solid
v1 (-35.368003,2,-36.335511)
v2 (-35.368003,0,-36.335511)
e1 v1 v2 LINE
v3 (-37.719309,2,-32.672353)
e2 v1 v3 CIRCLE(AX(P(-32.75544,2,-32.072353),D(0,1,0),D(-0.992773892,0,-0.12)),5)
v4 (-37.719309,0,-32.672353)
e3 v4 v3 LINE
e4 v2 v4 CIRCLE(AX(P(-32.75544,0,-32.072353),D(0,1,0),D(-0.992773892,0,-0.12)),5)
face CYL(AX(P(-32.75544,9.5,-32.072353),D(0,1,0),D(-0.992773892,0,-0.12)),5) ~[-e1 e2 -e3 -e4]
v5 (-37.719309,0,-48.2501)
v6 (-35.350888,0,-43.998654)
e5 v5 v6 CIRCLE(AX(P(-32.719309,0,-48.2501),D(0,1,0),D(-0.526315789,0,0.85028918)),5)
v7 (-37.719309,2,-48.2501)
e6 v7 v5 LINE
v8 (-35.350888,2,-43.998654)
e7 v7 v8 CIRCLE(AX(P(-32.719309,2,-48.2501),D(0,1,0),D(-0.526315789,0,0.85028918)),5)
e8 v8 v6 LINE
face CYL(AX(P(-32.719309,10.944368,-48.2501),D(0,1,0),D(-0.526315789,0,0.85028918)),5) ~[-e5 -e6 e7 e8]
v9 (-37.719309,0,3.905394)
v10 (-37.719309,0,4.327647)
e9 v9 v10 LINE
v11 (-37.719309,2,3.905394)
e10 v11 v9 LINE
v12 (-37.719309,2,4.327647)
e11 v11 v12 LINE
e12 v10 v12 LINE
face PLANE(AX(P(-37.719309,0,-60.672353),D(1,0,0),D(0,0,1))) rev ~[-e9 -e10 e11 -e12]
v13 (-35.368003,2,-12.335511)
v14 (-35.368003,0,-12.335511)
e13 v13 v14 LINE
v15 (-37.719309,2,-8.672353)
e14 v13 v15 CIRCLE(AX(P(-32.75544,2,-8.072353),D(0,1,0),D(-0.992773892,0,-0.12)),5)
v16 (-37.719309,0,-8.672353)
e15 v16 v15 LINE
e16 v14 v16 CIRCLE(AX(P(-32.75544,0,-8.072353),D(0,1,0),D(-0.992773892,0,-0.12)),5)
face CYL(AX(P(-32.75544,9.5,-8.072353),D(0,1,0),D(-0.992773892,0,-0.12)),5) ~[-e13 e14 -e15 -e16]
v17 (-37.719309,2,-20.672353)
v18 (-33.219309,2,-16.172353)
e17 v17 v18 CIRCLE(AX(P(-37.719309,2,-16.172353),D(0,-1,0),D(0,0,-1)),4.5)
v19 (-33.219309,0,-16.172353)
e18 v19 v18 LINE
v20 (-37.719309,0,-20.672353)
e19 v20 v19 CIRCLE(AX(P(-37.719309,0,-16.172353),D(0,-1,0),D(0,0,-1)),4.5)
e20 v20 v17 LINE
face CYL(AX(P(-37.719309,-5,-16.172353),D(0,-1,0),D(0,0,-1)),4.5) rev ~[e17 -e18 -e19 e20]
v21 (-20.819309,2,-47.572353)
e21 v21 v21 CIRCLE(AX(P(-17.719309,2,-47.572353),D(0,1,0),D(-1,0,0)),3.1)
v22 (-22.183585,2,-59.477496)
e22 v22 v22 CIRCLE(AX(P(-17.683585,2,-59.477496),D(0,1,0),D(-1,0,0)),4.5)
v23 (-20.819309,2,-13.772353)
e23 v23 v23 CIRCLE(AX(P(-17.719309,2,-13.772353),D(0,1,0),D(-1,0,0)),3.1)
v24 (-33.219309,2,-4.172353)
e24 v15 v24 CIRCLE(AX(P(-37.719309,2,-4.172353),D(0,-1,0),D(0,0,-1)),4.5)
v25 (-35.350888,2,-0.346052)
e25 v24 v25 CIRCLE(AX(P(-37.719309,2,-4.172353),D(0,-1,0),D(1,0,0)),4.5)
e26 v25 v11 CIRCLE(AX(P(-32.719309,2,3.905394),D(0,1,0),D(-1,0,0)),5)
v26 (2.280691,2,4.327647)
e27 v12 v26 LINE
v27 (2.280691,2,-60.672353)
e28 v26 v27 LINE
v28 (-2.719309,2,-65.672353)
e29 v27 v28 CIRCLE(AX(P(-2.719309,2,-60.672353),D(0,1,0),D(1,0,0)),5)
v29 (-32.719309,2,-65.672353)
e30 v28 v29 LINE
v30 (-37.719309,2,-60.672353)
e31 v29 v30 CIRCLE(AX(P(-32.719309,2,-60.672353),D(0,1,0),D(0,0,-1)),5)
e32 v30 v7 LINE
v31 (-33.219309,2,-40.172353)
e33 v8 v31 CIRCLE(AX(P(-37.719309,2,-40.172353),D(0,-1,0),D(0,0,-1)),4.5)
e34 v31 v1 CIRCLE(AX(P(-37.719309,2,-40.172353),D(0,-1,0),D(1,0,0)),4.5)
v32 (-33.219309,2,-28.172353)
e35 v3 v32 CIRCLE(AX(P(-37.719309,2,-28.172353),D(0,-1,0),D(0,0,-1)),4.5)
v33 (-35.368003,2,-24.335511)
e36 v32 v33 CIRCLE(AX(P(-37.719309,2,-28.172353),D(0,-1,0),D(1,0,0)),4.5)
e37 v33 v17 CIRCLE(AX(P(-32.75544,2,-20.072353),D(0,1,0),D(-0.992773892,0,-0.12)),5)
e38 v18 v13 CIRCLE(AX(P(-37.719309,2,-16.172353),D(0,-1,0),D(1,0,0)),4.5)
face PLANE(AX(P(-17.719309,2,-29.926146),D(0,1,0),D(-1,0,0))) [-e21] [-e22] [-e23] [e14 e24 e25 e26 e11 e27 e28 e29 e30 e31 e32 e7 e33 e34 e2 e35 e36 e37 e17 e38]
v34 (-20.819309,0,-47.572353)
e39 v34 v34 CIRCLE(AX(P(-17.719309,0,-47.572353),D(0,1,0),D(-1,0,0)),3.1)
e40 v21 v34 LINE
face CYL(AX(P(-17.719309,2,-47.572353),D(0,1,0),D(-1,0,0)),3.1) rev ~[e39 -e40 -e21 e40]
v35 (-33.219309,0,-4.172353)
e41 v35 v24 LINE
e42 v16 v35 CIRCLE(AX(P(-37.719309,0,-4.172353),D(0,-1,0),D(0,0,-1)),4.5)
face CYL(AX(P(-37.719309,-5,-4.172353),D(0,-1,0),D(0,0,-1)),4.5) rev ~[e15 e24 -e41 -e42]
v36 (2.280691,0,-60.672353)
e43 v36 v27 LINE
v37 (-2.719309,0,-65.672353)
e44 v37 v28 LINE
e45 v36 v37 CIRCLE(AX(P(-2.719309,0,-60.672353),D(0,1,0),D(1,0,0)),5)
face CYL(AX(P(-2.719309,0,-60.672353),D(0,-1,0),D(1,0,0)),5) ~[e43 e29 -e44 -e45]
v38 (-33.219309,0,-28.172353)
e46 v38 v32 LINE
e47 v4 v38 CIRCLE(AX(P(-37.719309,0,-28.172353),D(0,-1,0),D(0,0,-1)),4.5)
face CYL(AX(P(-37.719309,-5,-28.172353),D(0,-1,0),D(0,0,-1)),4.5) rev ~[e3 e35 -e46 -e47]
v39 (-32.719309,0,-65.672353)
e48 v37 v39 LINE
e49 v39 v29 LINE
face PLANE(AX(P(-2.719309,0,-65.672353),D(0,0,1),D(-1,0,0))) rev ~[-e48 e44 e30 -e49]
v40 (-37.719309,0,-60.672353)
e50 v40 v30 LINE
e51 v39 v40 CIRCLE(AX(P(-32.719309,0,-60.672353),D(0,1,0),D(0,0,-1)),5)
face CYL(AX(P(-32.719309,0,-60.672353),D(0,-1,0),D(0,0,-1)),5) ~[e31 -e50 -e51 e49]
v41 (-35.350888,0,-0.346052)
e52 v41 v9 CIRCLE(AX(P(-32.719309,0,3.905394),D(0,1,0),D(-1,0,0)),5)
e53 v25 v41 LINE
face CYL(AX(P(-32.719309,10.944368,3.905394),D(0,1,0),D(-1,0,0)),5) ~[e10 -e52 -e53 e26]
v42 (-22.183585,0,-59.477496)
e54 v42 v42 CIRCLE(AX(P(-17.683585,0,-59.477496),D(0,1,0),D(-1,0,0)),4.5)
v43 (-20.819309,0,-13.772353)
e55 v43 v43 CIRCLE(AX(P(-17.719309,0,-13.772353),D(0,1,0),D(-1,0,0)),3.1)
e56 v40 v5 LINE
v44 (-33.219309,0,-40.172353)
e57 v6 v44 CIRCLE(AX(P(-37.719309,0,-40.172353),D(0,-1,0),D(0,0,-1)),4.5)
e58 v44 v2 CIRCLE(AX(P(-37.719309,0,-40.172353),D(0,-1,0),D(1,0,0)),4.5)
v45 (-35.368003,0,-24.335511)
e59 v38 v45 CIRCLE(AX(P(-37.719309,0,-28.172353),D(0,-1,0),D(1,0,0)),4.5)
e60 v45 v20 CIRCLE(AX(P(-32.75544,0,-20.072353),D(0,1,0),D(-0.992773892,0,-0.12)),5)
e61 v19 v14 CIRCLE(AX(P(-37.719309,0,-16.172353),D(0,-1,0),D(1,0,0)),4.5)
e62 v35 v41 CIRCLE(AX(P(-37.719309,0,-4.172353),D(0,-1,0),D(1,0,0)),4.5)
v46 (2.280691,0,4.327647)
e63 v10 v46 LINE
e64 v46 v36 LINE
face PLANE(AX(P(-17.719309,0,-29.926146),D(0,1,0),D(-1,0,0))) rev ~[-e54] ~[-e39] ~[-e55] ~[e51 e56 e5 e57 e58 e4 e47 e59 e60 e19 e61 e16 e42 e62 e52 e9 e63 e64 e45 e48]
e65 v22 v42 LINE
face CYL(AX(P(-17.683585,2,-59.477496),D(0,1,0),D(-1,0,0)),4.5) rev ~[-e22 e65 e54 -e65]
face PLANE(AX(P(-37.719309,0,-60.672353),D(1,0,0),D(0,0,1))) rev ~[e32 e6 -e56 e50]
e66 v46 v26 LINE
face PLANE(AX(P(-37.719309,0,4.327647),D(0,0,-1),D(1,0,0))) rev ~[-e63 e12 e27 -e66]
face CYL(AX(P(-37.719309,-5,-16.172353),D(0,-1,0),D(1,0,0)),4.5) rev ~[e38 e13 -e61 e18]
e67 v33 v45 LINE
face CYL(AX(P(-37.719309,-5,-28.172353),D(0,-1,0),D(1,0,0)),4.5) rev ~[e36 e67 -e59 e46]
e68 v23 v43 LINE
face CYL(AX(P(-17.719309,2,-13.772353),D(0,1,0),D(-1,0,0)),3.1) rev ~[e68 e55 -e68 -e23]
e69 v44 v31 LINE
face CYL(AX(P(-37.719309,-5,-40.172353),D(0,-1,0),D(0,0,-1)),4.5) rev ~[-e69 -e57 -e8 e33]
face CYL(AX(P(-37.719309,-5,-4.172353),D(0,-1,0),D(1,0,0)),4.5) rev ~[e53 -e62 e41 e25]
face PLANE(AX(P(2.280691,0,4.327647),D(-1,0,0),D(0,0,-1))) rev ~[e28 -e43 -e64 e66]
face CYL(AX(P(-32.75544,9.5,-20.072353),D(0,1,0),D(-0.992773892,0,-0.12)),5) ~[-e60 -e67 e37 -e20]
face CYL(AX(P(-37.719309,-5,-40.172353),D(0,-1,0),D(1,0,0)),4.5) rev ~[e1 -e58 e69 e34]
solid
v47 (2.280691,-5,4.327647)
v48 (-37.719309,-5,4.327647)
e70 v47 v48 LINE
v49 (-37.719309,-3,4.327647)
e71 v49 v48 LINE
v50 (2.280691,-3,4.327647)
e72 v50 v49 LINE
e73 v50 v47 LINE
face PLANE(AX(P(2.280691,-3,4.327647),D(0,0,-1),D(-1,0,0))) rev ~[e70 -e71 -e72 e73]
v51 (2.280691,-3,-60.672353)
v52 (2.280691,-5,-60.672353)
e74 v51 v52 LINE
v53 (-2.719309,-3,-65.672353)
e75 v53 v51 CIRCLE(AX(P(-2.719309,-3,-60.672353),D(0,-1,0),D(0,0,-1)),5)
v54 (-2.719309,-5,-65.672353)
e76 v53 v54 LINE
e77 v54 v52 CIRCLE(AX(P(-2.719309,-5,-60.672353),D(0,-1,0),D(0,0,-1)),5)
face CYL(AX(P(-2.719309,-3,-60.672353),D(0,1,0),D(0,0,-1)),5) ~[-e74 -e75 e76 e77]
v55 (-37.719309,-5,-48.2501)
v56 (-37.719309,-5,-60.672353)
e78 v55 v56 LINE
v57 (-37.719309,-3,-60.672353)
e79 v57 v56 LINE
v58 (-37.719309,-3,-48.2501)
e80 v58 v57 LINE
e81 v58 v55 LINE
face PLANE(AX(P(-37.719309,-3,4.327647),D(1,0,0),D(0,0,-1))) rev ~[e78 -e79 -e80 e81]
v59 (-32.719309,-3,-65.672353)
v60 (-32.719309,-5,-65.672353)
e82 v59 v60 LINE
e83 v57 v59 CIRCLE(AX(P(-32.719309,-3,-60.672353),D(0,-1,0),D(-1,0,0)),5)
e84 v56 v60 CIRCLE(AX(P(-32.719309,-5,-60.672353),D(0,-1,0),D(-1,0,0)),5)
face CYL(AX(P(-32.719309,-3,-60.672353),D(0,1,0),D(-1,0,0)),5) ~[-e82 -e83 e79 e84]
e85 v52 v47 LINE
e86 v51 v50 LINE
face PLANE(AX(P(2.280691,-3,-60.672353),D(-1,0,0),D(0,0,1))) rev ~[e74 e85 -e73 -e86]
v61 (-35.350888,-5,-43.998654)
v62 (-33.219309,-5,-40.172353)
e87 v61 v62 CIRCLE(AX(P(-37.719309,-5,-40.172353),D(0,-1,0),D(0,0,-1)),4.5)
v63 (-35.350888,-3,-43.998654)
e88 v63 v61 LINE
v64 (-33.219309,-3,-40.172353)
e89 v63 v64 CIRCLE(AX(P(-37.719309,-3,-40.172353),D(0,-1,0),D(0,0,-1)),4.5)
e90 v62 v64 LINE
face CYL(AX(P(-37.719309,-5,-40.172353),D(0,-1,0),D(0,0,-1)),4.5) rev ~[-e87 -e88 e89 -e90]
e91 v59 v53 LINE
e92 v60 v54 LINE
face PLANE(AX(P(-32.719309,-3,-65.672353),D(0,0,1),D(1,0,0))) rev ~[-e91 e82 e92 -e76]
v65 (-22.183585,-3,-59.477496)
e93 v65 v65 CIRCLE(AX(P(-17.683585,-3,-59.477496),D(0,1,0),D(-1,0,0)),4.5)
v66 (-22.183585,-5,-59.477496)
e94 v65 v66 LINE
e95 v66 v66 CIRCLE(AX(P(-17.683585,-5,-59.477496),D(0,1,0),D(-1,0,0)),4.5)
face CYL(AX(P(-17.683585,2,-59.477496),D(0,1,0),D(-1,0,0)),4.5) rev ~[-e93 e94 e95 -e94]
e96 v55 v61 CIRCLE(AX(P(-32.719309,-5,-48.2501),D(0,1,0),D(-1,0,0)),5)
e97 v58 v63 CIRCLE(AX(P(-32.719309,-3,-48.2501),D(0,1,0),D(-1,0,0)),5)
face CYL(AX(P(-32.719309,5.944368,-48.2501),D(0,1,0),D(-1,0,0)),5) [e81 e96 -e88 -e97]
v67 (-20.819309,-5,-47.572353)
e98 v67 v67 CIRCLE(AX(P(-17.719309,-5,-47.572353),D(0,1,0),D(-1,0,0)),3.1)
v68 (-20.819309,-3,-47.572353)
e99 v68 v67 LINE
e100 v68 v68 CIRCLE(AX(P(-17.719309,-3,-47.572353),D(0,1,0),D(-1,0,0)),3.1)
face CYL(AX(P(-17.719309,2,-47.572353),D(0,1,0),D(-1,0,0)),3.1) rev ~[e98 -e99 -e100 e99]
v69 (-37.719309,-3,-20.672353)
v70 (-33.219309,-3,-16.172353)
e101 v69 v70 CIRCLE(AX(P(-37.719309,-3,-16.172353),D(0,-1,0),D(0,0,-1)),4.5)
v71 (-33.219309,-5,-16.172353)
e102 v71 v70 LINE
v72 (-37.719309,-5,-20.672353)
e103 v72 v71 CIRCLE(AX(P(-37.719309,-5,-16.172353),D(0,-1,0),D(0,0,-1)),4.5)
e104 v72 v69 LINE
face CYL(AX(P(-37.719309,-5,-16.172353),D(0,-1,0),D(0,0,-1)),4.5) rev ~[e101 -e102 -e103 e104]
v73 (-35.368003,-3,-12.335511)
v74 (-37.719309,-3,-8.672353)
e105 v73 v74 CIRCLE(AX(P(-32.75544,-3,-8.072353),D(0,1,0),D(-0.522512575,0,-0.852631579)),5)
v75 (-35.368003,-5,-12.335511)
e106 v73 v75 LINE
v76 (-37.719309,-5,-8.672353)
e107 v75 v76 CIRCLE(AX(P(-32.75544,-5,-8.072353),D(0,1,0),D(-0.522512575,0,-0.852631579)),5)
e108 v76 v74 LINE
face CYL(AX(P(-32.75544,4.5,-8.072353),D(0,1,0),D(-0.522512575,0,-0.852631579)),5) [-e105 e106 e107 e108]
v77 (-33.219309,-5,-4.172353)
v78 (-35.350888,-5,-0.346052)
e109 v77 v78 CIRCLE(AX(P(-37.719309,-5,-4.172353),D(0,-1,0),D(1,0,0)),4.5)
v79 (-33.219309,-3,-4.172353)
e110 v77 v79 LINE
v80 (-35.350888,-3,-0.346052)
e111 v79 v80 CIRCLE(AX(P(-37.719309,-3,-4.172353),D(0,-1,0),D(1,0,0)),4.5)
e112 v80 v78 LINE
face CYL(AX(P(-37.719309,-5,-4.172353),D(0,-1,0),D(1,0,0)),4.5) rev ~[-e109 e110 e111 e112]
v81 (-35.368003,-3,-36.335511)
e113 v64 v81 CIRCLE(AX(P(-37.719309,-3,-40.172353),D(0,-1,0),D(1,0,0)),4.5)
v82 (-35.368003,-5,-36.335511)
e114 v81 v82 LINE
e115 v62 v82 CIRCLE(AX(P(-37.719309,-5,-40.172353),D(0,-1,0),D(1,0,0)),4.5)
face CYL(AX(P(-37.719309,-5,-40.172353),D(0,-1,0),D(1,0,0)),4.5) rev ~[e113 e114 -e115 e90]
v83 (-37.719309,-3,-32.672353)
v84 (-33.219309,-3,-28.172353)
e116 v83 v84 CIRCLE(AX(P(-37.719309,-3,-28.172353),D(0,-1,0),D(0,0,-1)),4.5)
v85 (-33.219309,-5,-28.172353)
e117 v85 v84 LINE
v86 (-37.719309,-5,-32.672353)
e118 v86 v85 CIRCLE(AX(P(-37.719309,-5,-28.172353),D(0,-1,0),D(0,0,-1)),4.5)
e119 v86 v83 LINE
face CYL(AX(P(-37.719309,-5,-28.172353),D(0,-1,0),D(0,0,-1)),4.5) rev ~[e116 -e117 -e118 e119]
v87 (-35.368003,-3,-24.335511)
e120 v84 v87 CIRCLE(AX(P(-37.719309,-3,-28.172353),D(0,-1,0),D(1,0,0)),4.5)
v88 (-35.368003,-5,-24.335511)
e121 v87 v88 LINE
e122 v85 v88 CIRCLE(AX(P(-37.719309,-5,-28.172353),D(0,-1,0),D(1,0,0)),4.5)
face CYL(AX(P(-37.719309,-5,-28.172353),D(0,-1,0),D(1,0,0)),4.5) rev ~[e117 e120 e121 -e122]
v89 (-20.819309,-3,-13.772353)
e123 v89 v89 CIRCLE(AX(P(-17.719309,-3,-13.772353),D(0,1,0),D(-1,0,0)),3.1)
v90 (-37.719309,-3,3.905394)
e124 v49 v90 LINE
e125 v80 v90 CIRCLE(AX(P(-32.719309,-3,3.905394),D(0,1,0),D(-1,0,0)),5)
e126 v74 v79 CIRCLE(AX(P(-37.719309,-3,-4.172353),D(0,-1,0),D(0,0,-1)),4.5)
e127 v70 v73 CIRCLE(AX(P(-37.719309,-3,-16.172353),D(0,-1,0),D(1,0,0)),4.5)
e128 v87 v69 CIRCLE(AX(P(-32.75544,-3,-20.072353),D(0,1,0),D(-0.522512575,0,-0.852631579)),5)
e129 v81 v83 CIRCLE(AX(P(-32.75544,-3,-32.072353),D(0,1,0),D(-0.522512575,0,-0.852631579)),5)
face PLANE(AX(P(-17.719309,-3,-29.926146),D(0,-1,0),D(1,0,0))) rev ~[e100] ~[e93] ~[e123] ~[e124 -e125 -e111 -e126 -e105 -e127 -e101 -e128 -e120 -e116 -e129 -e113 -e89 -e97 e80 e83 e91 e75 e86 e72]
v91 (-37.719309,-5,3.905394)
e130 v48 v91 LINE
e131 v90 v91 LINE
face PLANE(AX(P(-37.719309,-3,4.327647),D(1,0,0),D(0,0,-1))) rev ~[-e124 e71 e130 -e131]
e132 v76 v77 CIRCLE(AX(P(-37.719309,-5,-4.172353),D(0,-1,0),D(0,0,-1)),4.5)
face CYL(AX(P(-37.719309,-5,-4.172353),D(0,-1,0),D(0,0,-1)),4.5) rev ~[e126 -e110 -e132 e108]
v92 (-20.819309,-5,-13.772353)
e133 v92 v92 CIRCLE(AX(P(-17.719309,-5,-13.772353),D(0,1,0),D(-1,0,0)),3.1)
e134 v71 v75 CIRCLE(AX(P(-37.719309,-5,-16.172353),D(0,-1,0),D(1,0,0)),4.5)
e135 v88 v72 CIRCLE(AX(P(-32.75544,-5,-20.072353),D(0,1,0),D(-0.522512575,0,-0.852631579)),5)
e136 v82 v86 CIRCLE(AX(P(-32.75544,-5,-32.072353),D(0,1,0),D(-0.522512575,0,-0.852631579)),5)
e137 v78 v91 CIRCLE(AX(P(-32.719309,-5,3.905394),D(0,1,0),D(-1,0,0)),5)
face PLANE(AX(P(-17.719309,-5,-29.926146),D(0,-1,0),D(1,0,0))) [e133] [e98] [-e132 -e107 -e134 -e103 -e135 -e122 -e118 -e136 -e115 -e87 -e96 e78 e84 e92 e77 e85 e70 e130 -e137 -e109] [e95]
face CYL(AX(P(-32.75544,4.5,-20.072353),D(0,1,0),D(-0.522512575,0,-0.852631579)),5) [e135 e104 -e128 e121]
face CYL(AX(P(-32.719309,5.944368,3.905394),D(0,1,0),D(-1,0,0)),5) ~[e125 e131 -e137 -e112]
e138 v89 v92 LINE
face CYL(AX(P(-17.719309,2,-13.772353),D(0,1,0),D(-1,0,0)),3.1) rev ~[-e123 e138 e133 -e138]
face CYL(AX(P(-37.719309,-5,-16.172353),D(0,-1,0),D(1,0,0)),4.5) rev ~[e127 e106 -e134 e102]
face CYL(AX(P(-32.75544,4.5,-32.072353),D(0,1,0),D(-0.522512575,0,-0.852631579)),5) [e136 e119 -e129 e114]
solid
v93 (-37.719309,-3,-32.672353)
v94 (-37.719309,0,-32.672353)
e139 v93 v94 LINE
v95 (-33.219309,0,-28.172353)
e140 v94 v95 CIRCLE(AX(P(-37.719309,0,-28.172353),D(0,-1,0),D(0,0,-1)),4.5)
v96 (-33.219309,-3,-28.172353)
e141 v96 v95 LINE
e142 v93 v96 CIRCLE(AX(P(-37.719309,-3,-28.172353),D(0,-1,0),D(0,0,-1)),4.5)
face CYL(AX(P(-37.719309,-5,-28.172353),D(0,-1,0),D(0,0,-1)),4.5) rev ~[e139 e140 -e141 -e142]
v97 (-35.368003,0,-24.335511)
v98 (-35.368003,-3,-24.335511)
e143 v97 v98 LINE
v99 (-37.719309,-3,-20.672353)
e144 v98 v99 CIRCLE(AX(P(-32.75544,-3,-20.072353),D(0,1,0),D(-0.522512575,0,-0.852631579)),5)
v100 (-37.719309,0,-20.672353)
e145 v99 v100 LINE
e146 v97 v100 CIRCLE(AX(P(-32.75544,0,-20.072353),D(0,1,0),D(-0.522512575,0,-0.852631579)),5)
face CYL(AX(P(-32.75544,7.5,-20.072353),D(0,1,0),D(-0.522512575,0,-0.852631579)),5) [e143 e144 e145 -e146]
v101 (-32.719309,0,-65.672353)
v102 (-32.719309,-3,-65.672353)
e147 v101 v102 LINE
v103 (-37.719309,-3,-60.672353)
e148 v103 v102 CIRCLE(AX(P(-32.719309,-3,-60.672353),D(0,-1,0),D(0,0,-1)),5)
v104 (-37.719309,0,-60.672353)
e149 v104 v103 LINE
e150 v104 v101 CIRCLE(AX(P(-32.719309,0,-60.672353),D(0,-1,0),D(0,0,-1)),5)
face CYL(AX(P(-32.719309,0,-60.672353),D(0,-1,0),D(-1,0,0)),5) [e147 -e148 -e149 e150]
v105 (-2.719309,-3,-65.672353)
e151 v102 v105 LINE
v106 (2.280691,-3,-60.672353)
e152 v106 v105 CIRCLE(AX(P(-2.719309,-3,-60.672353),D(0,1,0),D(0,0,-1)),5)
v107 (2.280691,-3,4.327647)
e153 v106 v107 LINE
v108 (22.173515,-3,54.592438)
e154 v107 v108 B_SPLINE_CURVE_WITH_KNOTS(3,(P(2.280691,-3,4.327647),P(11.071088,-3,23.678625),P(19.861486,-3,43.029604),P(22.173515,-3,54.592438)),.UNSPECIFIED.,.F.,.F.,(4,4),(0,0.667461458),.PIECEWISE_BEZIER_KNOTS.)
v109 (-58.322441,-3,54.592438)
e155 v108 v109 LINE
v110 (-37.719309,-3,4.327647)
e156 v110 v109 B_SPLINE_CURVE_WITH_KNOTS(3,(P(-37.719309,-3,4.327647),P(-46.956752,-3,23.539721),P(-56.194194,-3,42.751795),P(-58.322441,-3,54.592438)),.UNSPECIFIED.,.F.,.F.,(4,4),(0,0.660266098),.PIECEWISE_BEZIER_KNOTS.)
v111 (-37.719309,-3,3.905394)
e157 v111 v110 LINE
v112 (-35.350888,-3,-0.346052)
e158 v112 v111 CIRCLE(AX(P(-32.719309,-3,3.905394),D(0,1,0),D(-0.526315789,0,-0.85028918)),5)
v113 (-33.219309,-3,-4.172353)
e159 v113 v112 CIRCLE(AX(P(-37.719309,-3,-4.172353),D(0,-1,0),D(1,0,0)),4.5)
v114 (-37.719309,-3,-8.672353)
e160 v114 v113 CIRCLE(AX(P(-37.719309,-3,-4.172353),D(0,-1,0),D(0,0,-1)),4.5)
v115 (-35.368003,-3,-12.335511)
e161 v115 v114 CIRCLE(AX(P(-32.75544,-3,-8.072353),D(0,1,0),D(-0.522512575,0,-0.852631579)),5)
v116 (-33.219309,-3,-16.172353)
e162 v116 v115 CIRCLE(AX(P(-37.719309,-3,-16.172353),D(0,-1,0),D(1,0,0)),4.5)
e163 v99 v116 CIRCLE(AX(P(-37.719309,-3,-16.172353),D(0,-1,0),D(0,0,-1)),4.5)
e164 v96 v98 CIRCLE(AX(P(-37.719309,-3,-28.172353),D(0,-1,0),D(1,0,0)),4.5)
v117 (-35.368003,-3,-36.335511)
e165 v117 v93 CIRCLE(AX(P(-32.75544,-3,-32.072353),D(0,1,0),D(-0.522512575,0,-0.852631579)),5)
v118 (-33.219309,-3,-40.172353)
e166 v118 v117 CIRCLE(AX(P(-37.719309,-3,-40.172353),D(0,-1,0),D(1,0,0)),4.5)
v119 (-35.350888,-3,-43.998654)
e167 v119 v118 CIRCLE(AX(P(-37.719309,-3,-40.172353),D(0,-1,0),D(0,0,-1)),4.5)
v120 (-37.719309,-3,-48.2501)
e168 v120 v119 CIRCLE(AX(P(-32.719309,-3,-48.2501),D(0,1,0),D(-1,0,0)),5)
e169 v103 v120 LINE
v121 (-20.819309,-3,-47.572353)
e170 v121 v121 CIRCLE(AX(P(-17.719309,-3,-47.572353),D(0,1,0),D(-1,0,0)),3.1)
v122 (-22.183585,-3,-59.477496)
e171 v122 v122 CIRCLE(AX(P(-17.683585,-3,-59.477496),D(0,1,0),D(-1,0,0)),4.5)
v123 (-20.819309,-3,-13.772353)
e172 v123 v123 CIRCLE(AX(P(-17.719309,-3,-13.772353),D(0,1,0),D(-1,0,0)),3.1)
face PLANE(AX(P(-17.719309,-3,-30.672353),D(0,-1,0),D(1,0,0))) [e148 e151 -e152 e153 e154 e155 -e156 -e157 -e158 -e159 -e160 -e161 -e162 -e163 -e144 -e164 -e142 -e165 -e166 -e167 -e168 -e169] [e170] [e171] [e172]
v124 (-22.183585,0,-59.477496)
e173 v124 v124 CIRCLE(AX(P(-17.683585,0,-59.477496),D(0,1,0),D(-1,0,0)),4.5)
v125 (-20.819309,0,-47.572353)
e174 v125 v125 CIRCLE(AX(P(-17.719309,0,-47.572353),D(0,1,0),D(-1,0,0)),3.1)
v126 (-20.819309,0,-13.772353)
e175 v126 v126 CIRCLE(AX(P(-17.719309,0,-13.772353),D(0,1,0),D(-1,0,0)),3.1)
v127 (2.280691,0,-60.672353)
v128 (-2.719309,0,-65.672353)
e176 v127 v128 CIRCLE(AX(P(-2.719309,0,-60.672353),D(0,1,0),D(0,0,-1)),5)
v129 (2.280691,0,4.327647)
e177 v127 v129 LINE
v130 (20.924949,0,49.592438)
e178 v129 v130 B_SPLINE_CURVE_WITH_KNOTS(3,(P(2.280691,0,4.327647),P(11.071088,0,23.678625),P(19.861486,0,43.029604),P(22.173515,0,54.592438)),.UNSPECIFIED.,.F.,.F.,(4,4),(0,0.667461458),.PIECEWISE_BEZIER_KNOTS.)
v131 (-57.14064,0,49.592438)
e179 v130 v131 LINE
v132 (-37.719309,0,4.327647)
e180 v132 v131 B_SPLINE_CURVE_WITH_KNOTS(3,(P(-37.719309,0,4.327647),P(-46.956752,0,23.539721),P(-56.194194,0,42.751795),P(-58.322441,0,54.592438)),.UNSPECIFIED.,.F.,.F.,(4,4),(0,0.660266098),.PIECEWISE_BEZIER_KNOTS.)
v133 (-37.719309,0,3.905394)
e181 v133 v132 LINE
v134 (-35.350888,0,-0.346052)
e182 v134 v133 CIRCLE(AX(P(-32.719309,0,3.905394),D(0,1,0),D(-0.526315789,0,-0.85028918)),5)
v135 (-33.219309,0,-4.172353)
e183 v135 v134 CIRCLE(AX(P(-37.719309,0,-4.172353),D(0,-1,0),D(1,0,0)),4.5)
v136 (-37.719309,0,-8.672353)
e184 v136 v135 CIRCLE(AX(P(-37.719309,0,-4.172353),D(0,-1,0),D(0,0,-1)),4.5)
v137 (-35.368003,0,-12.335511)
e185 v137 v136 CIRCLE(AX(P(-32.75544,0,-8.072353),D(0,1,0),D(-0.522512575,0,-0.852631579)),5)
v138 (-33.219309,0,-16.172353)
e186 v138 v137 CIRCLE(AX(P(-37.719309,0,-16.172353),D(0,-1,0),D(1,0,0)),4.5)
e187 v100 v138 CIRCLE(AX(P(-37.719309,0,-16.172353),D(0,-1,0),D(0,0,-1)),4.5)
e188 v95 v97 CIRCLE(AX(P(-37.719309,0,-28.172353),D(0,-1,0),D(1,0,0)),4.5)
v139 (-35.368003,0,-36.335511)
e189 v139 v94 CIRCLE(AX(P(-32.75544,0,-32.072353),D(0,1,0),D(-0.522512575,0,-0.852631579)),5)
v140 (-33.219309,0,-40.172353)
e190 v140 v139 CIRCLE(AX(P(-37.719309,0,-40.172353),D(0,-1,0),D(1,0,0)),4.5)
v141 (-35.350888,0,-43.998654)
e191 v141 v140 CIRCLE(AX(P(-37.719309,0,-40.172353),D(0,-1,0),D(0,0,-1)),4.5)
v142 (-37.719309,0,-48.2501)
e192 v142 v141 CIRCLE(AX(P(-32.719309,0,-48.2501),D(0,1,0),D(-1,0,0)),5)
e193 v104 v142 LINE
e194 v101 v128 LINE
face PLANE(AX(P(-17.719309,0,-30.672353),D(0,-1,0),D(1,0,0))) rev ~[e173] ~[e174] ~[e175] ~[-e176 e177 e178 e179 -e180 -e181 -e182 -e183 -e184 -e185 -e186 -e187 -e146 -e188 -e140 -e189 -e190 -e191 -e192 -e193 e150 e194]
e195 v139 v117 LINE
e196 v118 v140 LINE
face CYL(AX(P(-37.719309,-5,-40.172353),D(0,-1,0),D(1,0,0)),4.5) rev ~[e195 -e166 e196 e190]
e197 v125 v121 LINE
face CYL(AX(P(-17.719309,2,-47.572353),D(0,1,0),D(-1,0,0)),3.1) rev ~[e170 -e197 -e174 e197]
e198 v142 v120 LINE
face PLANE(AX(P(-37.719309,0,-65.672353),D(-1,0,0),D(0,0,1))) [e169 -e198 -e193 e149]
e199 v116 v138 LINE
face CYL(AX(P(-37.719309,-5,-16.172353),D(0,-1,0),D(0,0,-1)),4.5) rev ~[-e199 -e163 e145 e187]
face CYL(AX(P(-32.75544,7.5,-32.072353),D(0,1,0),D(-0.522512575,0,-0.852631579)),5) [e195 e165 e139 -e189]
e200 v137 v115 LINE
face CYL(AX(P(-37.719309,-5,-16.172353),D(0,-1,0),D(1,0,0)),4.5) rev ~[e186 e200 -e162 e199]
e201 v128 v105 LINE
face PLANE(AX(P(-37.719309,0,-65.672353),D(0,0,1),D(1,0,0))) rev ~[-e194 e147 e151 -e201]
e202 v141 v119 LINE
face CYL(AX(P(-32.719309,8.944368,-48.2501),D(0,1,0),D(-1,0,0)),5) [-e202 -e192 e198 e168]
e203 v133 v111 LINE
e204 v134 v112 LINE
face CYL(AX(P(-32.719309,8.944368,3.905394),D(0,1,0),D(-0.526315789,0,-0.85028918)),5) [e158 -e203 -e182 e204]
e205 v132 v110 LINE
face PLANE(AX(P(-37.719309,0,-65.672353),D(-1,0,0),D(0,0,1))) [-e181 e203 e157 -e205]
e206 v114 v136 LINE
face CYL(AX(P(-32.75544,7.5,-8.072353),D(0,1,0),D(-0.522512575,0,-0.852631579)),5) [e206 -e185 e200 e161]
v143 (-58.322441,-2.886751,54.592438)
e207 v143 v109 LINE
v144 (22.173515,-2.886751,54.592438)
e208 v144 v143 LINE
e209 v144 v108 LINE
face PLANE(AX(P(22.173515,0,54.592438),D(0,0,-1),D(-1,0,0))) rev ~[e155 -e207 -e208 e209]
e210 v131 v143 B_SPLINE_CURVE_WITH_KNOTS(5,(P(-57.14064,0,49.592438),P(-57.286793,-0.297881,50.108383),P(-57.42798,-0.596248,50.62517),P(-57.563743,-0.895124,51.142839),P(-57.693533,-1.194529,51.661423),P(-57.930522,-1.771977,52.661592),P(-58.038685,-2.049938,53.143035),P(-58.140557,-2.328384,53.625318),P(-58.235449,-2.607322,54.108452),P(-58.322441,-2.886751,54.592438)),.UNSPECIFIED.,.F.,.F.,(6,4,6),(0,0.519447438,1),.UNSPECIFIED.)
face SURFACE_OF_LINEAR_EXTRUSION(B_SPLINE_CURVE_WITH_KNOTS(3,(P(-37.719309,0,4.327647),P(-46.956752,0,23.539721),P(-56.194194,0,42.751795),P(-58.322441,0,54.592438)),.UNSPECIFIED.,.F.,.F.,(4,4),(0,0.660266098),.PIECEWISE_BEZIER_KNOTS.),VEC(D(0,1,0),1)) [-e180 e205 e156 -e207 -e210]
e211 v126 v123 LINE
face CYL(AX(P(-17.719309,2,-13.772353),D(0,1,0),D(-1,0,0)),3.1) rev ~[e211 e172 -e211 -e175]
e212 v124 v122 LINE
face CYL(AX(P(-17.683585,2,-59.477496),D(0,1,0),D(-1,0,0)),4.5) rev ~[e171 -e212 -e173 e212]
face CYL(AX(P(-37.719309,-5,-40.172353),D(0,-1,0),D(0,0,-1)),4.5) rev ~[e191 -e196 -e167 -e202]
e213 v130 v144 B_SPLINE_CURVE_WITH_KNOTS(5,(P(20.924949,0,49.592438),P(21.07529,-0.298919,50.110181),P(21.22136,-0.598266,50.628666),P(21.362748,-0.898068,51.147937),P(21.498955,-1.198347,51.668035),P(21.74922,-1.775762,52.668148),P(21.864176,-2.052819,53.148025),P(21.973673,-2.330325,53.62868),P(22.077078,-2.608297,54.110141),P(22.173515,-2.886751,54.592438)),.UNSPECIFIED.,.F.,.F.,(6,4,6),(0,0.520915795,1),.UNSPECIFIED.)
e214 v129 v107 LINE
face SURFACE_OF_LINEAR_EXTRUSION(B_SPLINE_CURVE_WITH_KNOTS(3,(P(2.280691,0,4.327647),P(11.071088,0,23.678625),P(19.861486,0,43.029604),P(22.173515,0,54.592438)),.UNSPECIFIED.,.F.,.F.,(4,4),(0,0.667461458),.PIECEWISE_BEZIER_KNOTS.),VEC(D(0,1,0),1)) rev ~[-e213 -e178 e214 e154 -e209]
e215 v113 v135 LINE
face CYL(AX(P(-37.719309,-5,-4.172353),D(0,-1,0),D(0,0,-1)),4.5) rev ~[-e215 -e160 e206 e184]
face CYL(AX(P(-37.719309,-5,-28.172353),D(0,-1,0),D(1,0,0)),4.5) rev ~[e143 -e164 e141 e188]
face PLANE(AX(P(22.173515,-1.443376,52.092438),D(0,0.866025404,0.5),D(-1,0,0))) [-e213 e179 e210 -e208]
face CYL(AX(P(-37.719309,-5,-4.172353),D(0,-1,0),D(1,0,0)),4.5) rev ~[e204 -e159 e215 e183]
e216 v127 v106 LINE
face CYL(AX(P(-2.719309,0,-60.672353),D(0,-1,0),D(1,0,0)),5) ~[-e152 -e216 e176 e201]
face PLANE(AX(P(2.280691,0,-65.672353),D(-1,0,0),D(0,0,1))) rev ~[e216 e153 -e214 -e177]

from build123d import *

# Parameters (mm, degrees)
F0_W           = 40
F0_H           = 70
F1_DEPTH       = 3
F2_SIZE2       = 2.8867513459
F2_SIZE        = 5
F3_R           = 5
F5_DEPTH       = 2
F7_DEPTH       = 2
F9_DEPTH       = 25
F10_T1_DEPTH   = 20.8887360535
F10_T3_DEPTH   = 18
F10_2_T1_DEPTH = 19.8887360535
F10_2_T3_DEPTH = 17
F10_3_T1_DEPTH = 19.8887360535
F10_3_T3_DEPTH = 17
F11_R          = 3.1
F12_DEPTH      = 25
F13_R          = 4.5
F14_DEPTH      = 25


# Not quite as in the source:
# - a fillet or chamfer that OpenCascade refuses, or shapes differently, is made with other operations: its cross-section is extruded or revolved along the edge and cut away or added


with BuildPart() as f1:
    # F0 (on Front) → F1 (new body)
    with BuildSketch(Plane.XZ):
        with Locations((-17.71930933, -30.67235291)):
            Rectangle(F0_W, F0_H)
        with BuildLine():
            add(Edge.make_bspline(
                [(-37.71930933, 4.32764709), (-46.9567519014, 23.5397209268), (-56.1941944728, 42.7517947636), (-58.3224408329, 54.5924380422)],
                knots=[0, 0, 0, 0, 0.660266098, 0.660266098, 0.660266098, 0.660266098], degree=3))
            Line((-37.71930933, 4.32764709), (2.28069067, 4.32764709))
            add(Edge.make_bspline(
                [(2.28069067, 4.32764709), (11.0710881678, 23.6786254545), (19.8614856657, 43.029603819), (22.1735145897, 54.5924380422)],
                knots=[0, 0, 0, 0, 0.6674614582, 0.6674614582, 0.6674614582, 0.6674614582], degree=3))
            Line((22.1735145897, 54.5924380422), (-58.3224408329, 54.5924380422))
        make_face()
    extrude(amount=F1_DEPTH)

    # F2
    f2_edges = [f1.edges().sort_by_distance(p)[0] for p in [
        (-18.074463, 0, 54.592438),
    ]]
    f2_side = f1.faces().sort_by_distance((-17.870768, 0, 2.51511))[0]
    chamfer(f2_edges, length=F2_SIZE, length2=F2_SIZE2, reference=f2_side)

    # F3
    f3_edges = [f1.edges().sort_by_distance(p)[0] for p in [
        (2.280691, -1.5, -65.672353),
        (-37.719309, -1.5, -65.672353),
    ]]
    fillet(f3_edges, radius=F3_R)


with BuildPart() as f5:
    # F4 (on face) → F5 (new body)
    with BuildSketch(Plane.XZ.offset(3)):
        with BuildLine():
            Line((2.28069067, 4.32764709), (-37.71930933, 4.32764709))
            Line((-37.71930933, 4.32764709), (-37.71930933, -60.67235291))
            ThreePointArc((-37.71930933, -60.67235291), (-36.2548432359, -64.207886816), (-32.71930933, -65.67235291))
            Line((-32.71930933, -65.67235291), (-2.71930933, -65.67235291))
            ThreePointArc((-2.71930933, -65.67235291), (0.8162245759, -64.207886816), (2.28069067, -60.67235291))
            Line((2.28069067, -60.67235291), (2.28069067, 4.32764709))
        make_face()
    extrude(amount=F5_DEPTH)


with BuildPart() as f7:
    # F6 (on face) → F7 (new body)
    with BuildSketch(Plane(origin=(0, 0, 0), x_dir=(-1, 0, 0), z_dir=(0, 1, 0))):
        with BuildLine():
            Line((37.71930933, 4.32764709), (-2.28069067, 4.32764709))
            Line((-2.28069067, 4.32764709), (-2.28069067, -60.67235291))
            ThreePointArc((-2.28069067, -60.67235291), (-0.8162245759, -64.207886816), (2.71930933, -65.67235291))
            Line((2.71930933, -65.67235291), (32.71930933, -65.67235291))
            ThreePointArc((32.71930933, -65.67235291), (36.2548432359, -64.207886816), (37.71930933, -60.67235291))
            Line((37.71930933, -60.67235291), (37.71930933, 4.32764709))
        make_face()
    extrude(amount=F7_DEPTH)


with BuildPart() as f9_tool:
    # F8 (on face) → F9 (new body)
    with BuildSketch(Plane.XZ.offset(5)):
        with BuildLine():
            ThreePointArc((-37.71930933, -8.67235291), (-34.5373288146, -7.3543334254), (-33.21930933, -4.17235291))
            ThreePointArc((-33.21930933, -4.17235291), (-34.5373288146, -0.9903723947), (-37.71930933, 0.32764709))
            Line((-37.71930933, 0.32764709), (-37.71930933, -8.67235291))
        make_face()
        with BuildLine():
            ThreePointArc((-33.21930933, -16.17235291), (-34.5373288146, -12.9903723947), (-37.71930933, -11.67235291))
            Line((-37.71930933, -11.67235291), (-37.71930933, -20.67235291))
            ThreePointArc((-37.71930933, -20.67235291), (-34.5373288146, -19.3543334254), (-33.21930933, -16.17235291))
        make_face()
        with BuildLine():
            ThreePointArc((-33.21930933, -28.17235291), (-34.5373288146, -24.9903723947), (-37.71930933, -23.67235291))
            Line((-37.71930933, -23.67235291), (-37.71930933, -32.67235291))
            ThreePointArc((-37.71930933, -32.67235291), (-34.5373288146, -31.3543334254), (-33.21930933, -28.17235291))
        make_face()
        with BuildLine():
            ThreePointArc((-33.21930933, -40.17235291), (-34.5373288146, -36.9903723947), (-37.71930933, -35.67235291))
            Line((-37.71930933, -35.67235291), (-37.71930933, -44.67235291))
            ThreePointArc((-37.71930933, -44.67235291), (-34.5373288146, -43.3543334254), (-33.21930933, -40.17235291))
        make_face()
    extrude(amount=-F9_DEPTH)


with BuildPart() as f1_1:
    add(f1.part)

    # F9: cut by f9_tool
    add(f9_tool.part, mode=Mode.SUBTRACT)

    # F10: fillet of radius 5 on 5 edges, made by hand

    # F10_s2 → F10_t1 (cut)
    with BuildSketch(Plane.XZ.offset(-8.9443680268)):
        with BuildLine():
            ThreePointArc((-35.3508882774, -0.3460515997), (-37.0872547702, 1.4720729837), (-37.71930933, 3.9053943007))
            Line((-37.71930933, 3.9053943007), (-37.71930933, 0.32764709))
            ThreePointArc((-37.71930933, 0.32764709), (-36.4881220771, 0.1559467501), (-35.3508882774, -0.3460515997))
        make_face()
        with BuildLine():
            ThreePointArc((-37.71930933, -48.2501001207), (-37.0872547702, -45.8167788038), (-35.3508882774, -43.9986542204))
            ThreePointArc((-35.3508882774, -43.9986542204), (-36.4881220771, -44.5006525702), (-37.71930933, -44.67235291))
            Line((-37.71930933, -44.67235291), (-37.71930933, -48.2501001207))
        make_face()
    extrude(amount=F10_T1_DEPTH, mode=Mode.SUBTRACT)

    # F10_s4 → F10_t3 (cut)
    with BuildSketch(Plane.XZ.offset(-7.5)):
        with BuildLine():
            ThreePointArc((-35.3680027444, -12.3355108048), (-36.9632021222, -10.7732299606), (-37.71930933, -8.67235291))
            Line((-37.71930933, -8.67235291), (-37.71930933, -11.67235291))
            ThreePointArc((-37.71930933, -11.67235291), (-36.4977917234, -11.8413143814), (-35.3680027444, -12.3355108048))
        make_face()
        with BuildLine():
            ThreePointArc((-35.3680027444, -24.3355108048), (-36.9632021222, -22.7732299606), (-37.71930933, -20.67235291))
            Line((-37.71930933, -20.67235291), (-37.71930933, -23.67235291))
            ThreePointArc((-37.71930933, -23.67235291), (-36.4977917234, -23.8413143814), (-35.3680027444, -24.3355108048))
        make_face()
        with BuildLine():
            ThreePointArc((-35.3680027444, -36.3355108048), (-36.9632021222, -34.7732299606), (-37.71930933, -32.67235291))
            Line((-37.71930933, -32.67235291), (-37.71930933, -35.67235291))
            ThreePointArc((-37.71930933, -35.67235291), (-36.4977917234, -35.8413143814), (-35.3680027444, -36.3355108048))
        make_face()
    extrude(amount=F10_T3_DEPTH, mode=Mode.SUBTRACT)


with BuildPart() as f5_1:
    add(f5.part)

    # F9: cut by f9_tool
    add(f9_tool.part, mode=Mode.SUBTRACT)

    # F10#2: fillet of radius 5 on 5 edges, made by hand

    # F10_2_s2 → F10_2_t1 (cut)
    with BuildSketch(Plane.XZ.offset(-5.9443680268)):
        with BuildLine():
            ThreePointArc((-37.71930933, 3.9053943007), (-37.0872547702, 1.4720729837), (-35.3508882774, -0.3460515997))
            ThreePointArc((-35.3508882774, -0.3460515997), (-36.4881220771, 0.1559467501), (-37.71930933, 0.32764709))
            Line((-37.71930933, 0.32764709), (-37.71930933, 3.9053943007))
        make_face()
        with BuildLine():
            ThreePointArc((-37.71930933, -48.2501001207), (-37.0872547702, -45.8167788038), (-35.3508882774, -43.9986542204))
            ThreePointArc((-35.3508882774, -43.9986542204), (-36.4881220771, -44.5006525702), (-37.71930933, -44.67235291))
            Line((-37.71930933, -44.67235291), (-37.71930933, -48.2501001207))
        make_face()
    extrude(amount=F10_2_T1_DEPTH, mode=Mode.SUBTRACT)

    # F10_2_s4 → F10_2_t3 (cut)
    with BuildSketch(Plane.XZ.offset(-4.5)):
        with BuildLine():
            ThreePointArc((-35.3680027444, -12.3355108048), (-36.9632021222, -10.7732299606), (-37.71930933, -8.67235291))
            Line((-37.71930933, -8.67235291), (-37.71930933, -11.67235291))
            ThreePointArc((-37.71930933, -11.67235291), (-36.4977917234, -11.8413143814), (-35.3680027444, -12.3355108048))
        make_face()
        with BuildLine():
            ThreePointArc((-35.3680027444, -24.3355108048), (-36.9632021222, -22.7732299606), (-37.71930933, -20.67235291))
            Line((-37.71930933, -20.67235291), (-37.71930933, -23.67235291))
            ThreePointArc((-37.71930933, -23.67235291), (-36.4977917234, -23.8413143814), (-35.3680027444, -24.3355108048))
        make_face()
        with BuildLine():
            ThreePointArc((-35.3680027444, -36.3355108048), (-36.9632021222, -34.7732299606), (-37.71930933, -32.67235291))
            Line((-37.71930933, -32.67235291), (-37.71930933, -35.67235291))
            ThreePointArc((-37.71930933, -35.67235291), (-36.4977917234, -35.8413143814), (-35.3680027444, -36.3355108048))
        make_face()
    extrude(amount=F10_2_T3_DEPTH, mode=Mode.SUBTRACT)


with BuildPart() as f7_1:
    add(f7.part)

    # F9: cut by f9_tool
    add(f9_tool.part, mode=Mode.SUBTRACT)

    # F10#3: fillet of radius 5 on 5 edges, made by hand

    # F10_3_s2 → F10_3_t1 (cut)
    with BuildSketch(Plane.XZ.offset(-10.9443680268)):
        with BuildLine():
            ThreePointArc((-37.71930933, 3.9053943007), (-37.0872547702, 1.4720729837), (-35.3508882774, -0.3460515997))
            ThreePointArc((-35.3508882774, -0.3460515997), (-36.4881220771, 0.1559467501), (-37.71930933, 0.32764709))
            Line((-37.71930933, 0.32764709), (-37.71930933, 3.9053943007))
        make_face()
        with BuildLine():
            ThreePointArc((-35.3508882774, -43.9986542204), (-37.0872547702, -45.8167788038), (-37.71930933, -48.2501001207))
            Line((-37.71930933, -48.2501001207), (-37.71930933, -44.67235291))
            ThreePointArc((-37.71930933, -44.67235291), (-36.4881220771, -44.5006525702), (-35.3508882774, -43.9986542204))
        make_face()
    extrude(amount=F10_3_T1_DEPTH, mode=Mode.SUBTRACT)

    # F10_3_s4 → F10_3_t3 (cut)
    with BuildSketch(Plane.XZ.offset(-9.5)):
        with BuildLine():
            ThreePointArc((-37.71930933, -8.67235291), (-36.9632021222, -10.7732299606), (-35.3680027444, -12.3355108048))
            ThreePointArc((-35.3680027444, -12.3355108048), (-36.4977917234, -11.8413143814), (-37.71930933, -11.67235291))
            Line((-37.71930933, -11.67235291), (-37.71930933, -8.67235291))
        make_face()
        with BuildLine():
            ThreePointArc((-37.71930933, -20.67235291), (-36.9632021222, -22.7732299606), (-35.3680027444, -24.3355108048))
            ThreePointArc((-35.3680027444, -24.3355108048), (-36.4977917234, -23.8413143814), (-37.71930933, -23.67235291))
            Line((-37.71930933, -23.67235291), (-37.71930933, -20.67235291))
        make_face()
        with BuildLine():
            ThreePointArc((-37.71930933, -32.67235291), (-36.9632021222, -34.7732299606), (-35.3680027444, -36.3355108048))
            ThreePointArc((-35.3680027444, -36.3355108048), (-36.4977917234, -35.8413143814), (-37.71930933, -35.67235291))
            Line((-37.71930933, -35.67235291), (-37.71930933, -32.67235291))
        make_face()
    extrude(amount=F10_3_T3_DEPTH, mode=Mode.SUBTRACT)


with BuildPart() as f12_tool:
    # F11 (on face) → F12 (new body)
    with BuildSketch(Plane(origin=(0, 2, 0), x_dir=(-1, 0, 0), z_dir=(0, 1, 0))):
        with Locations((17.71930933, -13.77235291)):
            Circle(F11_R)
        with Locations((17.71930933, -47.57235291)):
            Circle(F11_R)
    extrude(amount=-F12_DEPTH)


with BuildPart() as f1_2:
    add(f1_1.part)

    # F12: cut by f12_tool
    add(f12_tool.part, mode=Mode.SUBTRACT)


with BuildPart() as f5_2:
    add(f5_1.part)

    # F12: cut by f12_tool
    add(f12_tool.part, mode=Mode.SUBTRACT)


with BuildPart() as f7_2:
    add(f7_1.part)

    # F12: cut by f12_tool
    add(f12_tool.part, mode=Mode.SUBTRACT)


with BuildPart() as f14_tool:
    # F13 (on face) → F14 (new body)
    with BuildSketch(Plane(origin=(0, 2, 0), x_dir=(-1, 0, 0), z_dir=(0, 1, 0))):
        with Locations((17.6835853607, -59.4774961946)):
            Circle(F13_R)
    extrude(amount=-F14_DEPTH)


with BuildPart() as f1_3:
    add(f1_2.part)

    # F14: cut by f14_tool
    add(f14_tool.part, mode=Mode.SUBTRACT)


with BuildPart() as f5_3:
    add(f5_2.part)

    # F14: cut by f14_tool
    add(f14_tool.part, mode=Mode.SUBTRACT)


with BuildPart() as f7_3:
    add(f7_2.part)

    # F14: cut by f14_tool
    add(f14_tool.part, mode=Mode.SUBTRACT)


solid = Compound([f1_3.part, f5_3.part, f7_3.part])
